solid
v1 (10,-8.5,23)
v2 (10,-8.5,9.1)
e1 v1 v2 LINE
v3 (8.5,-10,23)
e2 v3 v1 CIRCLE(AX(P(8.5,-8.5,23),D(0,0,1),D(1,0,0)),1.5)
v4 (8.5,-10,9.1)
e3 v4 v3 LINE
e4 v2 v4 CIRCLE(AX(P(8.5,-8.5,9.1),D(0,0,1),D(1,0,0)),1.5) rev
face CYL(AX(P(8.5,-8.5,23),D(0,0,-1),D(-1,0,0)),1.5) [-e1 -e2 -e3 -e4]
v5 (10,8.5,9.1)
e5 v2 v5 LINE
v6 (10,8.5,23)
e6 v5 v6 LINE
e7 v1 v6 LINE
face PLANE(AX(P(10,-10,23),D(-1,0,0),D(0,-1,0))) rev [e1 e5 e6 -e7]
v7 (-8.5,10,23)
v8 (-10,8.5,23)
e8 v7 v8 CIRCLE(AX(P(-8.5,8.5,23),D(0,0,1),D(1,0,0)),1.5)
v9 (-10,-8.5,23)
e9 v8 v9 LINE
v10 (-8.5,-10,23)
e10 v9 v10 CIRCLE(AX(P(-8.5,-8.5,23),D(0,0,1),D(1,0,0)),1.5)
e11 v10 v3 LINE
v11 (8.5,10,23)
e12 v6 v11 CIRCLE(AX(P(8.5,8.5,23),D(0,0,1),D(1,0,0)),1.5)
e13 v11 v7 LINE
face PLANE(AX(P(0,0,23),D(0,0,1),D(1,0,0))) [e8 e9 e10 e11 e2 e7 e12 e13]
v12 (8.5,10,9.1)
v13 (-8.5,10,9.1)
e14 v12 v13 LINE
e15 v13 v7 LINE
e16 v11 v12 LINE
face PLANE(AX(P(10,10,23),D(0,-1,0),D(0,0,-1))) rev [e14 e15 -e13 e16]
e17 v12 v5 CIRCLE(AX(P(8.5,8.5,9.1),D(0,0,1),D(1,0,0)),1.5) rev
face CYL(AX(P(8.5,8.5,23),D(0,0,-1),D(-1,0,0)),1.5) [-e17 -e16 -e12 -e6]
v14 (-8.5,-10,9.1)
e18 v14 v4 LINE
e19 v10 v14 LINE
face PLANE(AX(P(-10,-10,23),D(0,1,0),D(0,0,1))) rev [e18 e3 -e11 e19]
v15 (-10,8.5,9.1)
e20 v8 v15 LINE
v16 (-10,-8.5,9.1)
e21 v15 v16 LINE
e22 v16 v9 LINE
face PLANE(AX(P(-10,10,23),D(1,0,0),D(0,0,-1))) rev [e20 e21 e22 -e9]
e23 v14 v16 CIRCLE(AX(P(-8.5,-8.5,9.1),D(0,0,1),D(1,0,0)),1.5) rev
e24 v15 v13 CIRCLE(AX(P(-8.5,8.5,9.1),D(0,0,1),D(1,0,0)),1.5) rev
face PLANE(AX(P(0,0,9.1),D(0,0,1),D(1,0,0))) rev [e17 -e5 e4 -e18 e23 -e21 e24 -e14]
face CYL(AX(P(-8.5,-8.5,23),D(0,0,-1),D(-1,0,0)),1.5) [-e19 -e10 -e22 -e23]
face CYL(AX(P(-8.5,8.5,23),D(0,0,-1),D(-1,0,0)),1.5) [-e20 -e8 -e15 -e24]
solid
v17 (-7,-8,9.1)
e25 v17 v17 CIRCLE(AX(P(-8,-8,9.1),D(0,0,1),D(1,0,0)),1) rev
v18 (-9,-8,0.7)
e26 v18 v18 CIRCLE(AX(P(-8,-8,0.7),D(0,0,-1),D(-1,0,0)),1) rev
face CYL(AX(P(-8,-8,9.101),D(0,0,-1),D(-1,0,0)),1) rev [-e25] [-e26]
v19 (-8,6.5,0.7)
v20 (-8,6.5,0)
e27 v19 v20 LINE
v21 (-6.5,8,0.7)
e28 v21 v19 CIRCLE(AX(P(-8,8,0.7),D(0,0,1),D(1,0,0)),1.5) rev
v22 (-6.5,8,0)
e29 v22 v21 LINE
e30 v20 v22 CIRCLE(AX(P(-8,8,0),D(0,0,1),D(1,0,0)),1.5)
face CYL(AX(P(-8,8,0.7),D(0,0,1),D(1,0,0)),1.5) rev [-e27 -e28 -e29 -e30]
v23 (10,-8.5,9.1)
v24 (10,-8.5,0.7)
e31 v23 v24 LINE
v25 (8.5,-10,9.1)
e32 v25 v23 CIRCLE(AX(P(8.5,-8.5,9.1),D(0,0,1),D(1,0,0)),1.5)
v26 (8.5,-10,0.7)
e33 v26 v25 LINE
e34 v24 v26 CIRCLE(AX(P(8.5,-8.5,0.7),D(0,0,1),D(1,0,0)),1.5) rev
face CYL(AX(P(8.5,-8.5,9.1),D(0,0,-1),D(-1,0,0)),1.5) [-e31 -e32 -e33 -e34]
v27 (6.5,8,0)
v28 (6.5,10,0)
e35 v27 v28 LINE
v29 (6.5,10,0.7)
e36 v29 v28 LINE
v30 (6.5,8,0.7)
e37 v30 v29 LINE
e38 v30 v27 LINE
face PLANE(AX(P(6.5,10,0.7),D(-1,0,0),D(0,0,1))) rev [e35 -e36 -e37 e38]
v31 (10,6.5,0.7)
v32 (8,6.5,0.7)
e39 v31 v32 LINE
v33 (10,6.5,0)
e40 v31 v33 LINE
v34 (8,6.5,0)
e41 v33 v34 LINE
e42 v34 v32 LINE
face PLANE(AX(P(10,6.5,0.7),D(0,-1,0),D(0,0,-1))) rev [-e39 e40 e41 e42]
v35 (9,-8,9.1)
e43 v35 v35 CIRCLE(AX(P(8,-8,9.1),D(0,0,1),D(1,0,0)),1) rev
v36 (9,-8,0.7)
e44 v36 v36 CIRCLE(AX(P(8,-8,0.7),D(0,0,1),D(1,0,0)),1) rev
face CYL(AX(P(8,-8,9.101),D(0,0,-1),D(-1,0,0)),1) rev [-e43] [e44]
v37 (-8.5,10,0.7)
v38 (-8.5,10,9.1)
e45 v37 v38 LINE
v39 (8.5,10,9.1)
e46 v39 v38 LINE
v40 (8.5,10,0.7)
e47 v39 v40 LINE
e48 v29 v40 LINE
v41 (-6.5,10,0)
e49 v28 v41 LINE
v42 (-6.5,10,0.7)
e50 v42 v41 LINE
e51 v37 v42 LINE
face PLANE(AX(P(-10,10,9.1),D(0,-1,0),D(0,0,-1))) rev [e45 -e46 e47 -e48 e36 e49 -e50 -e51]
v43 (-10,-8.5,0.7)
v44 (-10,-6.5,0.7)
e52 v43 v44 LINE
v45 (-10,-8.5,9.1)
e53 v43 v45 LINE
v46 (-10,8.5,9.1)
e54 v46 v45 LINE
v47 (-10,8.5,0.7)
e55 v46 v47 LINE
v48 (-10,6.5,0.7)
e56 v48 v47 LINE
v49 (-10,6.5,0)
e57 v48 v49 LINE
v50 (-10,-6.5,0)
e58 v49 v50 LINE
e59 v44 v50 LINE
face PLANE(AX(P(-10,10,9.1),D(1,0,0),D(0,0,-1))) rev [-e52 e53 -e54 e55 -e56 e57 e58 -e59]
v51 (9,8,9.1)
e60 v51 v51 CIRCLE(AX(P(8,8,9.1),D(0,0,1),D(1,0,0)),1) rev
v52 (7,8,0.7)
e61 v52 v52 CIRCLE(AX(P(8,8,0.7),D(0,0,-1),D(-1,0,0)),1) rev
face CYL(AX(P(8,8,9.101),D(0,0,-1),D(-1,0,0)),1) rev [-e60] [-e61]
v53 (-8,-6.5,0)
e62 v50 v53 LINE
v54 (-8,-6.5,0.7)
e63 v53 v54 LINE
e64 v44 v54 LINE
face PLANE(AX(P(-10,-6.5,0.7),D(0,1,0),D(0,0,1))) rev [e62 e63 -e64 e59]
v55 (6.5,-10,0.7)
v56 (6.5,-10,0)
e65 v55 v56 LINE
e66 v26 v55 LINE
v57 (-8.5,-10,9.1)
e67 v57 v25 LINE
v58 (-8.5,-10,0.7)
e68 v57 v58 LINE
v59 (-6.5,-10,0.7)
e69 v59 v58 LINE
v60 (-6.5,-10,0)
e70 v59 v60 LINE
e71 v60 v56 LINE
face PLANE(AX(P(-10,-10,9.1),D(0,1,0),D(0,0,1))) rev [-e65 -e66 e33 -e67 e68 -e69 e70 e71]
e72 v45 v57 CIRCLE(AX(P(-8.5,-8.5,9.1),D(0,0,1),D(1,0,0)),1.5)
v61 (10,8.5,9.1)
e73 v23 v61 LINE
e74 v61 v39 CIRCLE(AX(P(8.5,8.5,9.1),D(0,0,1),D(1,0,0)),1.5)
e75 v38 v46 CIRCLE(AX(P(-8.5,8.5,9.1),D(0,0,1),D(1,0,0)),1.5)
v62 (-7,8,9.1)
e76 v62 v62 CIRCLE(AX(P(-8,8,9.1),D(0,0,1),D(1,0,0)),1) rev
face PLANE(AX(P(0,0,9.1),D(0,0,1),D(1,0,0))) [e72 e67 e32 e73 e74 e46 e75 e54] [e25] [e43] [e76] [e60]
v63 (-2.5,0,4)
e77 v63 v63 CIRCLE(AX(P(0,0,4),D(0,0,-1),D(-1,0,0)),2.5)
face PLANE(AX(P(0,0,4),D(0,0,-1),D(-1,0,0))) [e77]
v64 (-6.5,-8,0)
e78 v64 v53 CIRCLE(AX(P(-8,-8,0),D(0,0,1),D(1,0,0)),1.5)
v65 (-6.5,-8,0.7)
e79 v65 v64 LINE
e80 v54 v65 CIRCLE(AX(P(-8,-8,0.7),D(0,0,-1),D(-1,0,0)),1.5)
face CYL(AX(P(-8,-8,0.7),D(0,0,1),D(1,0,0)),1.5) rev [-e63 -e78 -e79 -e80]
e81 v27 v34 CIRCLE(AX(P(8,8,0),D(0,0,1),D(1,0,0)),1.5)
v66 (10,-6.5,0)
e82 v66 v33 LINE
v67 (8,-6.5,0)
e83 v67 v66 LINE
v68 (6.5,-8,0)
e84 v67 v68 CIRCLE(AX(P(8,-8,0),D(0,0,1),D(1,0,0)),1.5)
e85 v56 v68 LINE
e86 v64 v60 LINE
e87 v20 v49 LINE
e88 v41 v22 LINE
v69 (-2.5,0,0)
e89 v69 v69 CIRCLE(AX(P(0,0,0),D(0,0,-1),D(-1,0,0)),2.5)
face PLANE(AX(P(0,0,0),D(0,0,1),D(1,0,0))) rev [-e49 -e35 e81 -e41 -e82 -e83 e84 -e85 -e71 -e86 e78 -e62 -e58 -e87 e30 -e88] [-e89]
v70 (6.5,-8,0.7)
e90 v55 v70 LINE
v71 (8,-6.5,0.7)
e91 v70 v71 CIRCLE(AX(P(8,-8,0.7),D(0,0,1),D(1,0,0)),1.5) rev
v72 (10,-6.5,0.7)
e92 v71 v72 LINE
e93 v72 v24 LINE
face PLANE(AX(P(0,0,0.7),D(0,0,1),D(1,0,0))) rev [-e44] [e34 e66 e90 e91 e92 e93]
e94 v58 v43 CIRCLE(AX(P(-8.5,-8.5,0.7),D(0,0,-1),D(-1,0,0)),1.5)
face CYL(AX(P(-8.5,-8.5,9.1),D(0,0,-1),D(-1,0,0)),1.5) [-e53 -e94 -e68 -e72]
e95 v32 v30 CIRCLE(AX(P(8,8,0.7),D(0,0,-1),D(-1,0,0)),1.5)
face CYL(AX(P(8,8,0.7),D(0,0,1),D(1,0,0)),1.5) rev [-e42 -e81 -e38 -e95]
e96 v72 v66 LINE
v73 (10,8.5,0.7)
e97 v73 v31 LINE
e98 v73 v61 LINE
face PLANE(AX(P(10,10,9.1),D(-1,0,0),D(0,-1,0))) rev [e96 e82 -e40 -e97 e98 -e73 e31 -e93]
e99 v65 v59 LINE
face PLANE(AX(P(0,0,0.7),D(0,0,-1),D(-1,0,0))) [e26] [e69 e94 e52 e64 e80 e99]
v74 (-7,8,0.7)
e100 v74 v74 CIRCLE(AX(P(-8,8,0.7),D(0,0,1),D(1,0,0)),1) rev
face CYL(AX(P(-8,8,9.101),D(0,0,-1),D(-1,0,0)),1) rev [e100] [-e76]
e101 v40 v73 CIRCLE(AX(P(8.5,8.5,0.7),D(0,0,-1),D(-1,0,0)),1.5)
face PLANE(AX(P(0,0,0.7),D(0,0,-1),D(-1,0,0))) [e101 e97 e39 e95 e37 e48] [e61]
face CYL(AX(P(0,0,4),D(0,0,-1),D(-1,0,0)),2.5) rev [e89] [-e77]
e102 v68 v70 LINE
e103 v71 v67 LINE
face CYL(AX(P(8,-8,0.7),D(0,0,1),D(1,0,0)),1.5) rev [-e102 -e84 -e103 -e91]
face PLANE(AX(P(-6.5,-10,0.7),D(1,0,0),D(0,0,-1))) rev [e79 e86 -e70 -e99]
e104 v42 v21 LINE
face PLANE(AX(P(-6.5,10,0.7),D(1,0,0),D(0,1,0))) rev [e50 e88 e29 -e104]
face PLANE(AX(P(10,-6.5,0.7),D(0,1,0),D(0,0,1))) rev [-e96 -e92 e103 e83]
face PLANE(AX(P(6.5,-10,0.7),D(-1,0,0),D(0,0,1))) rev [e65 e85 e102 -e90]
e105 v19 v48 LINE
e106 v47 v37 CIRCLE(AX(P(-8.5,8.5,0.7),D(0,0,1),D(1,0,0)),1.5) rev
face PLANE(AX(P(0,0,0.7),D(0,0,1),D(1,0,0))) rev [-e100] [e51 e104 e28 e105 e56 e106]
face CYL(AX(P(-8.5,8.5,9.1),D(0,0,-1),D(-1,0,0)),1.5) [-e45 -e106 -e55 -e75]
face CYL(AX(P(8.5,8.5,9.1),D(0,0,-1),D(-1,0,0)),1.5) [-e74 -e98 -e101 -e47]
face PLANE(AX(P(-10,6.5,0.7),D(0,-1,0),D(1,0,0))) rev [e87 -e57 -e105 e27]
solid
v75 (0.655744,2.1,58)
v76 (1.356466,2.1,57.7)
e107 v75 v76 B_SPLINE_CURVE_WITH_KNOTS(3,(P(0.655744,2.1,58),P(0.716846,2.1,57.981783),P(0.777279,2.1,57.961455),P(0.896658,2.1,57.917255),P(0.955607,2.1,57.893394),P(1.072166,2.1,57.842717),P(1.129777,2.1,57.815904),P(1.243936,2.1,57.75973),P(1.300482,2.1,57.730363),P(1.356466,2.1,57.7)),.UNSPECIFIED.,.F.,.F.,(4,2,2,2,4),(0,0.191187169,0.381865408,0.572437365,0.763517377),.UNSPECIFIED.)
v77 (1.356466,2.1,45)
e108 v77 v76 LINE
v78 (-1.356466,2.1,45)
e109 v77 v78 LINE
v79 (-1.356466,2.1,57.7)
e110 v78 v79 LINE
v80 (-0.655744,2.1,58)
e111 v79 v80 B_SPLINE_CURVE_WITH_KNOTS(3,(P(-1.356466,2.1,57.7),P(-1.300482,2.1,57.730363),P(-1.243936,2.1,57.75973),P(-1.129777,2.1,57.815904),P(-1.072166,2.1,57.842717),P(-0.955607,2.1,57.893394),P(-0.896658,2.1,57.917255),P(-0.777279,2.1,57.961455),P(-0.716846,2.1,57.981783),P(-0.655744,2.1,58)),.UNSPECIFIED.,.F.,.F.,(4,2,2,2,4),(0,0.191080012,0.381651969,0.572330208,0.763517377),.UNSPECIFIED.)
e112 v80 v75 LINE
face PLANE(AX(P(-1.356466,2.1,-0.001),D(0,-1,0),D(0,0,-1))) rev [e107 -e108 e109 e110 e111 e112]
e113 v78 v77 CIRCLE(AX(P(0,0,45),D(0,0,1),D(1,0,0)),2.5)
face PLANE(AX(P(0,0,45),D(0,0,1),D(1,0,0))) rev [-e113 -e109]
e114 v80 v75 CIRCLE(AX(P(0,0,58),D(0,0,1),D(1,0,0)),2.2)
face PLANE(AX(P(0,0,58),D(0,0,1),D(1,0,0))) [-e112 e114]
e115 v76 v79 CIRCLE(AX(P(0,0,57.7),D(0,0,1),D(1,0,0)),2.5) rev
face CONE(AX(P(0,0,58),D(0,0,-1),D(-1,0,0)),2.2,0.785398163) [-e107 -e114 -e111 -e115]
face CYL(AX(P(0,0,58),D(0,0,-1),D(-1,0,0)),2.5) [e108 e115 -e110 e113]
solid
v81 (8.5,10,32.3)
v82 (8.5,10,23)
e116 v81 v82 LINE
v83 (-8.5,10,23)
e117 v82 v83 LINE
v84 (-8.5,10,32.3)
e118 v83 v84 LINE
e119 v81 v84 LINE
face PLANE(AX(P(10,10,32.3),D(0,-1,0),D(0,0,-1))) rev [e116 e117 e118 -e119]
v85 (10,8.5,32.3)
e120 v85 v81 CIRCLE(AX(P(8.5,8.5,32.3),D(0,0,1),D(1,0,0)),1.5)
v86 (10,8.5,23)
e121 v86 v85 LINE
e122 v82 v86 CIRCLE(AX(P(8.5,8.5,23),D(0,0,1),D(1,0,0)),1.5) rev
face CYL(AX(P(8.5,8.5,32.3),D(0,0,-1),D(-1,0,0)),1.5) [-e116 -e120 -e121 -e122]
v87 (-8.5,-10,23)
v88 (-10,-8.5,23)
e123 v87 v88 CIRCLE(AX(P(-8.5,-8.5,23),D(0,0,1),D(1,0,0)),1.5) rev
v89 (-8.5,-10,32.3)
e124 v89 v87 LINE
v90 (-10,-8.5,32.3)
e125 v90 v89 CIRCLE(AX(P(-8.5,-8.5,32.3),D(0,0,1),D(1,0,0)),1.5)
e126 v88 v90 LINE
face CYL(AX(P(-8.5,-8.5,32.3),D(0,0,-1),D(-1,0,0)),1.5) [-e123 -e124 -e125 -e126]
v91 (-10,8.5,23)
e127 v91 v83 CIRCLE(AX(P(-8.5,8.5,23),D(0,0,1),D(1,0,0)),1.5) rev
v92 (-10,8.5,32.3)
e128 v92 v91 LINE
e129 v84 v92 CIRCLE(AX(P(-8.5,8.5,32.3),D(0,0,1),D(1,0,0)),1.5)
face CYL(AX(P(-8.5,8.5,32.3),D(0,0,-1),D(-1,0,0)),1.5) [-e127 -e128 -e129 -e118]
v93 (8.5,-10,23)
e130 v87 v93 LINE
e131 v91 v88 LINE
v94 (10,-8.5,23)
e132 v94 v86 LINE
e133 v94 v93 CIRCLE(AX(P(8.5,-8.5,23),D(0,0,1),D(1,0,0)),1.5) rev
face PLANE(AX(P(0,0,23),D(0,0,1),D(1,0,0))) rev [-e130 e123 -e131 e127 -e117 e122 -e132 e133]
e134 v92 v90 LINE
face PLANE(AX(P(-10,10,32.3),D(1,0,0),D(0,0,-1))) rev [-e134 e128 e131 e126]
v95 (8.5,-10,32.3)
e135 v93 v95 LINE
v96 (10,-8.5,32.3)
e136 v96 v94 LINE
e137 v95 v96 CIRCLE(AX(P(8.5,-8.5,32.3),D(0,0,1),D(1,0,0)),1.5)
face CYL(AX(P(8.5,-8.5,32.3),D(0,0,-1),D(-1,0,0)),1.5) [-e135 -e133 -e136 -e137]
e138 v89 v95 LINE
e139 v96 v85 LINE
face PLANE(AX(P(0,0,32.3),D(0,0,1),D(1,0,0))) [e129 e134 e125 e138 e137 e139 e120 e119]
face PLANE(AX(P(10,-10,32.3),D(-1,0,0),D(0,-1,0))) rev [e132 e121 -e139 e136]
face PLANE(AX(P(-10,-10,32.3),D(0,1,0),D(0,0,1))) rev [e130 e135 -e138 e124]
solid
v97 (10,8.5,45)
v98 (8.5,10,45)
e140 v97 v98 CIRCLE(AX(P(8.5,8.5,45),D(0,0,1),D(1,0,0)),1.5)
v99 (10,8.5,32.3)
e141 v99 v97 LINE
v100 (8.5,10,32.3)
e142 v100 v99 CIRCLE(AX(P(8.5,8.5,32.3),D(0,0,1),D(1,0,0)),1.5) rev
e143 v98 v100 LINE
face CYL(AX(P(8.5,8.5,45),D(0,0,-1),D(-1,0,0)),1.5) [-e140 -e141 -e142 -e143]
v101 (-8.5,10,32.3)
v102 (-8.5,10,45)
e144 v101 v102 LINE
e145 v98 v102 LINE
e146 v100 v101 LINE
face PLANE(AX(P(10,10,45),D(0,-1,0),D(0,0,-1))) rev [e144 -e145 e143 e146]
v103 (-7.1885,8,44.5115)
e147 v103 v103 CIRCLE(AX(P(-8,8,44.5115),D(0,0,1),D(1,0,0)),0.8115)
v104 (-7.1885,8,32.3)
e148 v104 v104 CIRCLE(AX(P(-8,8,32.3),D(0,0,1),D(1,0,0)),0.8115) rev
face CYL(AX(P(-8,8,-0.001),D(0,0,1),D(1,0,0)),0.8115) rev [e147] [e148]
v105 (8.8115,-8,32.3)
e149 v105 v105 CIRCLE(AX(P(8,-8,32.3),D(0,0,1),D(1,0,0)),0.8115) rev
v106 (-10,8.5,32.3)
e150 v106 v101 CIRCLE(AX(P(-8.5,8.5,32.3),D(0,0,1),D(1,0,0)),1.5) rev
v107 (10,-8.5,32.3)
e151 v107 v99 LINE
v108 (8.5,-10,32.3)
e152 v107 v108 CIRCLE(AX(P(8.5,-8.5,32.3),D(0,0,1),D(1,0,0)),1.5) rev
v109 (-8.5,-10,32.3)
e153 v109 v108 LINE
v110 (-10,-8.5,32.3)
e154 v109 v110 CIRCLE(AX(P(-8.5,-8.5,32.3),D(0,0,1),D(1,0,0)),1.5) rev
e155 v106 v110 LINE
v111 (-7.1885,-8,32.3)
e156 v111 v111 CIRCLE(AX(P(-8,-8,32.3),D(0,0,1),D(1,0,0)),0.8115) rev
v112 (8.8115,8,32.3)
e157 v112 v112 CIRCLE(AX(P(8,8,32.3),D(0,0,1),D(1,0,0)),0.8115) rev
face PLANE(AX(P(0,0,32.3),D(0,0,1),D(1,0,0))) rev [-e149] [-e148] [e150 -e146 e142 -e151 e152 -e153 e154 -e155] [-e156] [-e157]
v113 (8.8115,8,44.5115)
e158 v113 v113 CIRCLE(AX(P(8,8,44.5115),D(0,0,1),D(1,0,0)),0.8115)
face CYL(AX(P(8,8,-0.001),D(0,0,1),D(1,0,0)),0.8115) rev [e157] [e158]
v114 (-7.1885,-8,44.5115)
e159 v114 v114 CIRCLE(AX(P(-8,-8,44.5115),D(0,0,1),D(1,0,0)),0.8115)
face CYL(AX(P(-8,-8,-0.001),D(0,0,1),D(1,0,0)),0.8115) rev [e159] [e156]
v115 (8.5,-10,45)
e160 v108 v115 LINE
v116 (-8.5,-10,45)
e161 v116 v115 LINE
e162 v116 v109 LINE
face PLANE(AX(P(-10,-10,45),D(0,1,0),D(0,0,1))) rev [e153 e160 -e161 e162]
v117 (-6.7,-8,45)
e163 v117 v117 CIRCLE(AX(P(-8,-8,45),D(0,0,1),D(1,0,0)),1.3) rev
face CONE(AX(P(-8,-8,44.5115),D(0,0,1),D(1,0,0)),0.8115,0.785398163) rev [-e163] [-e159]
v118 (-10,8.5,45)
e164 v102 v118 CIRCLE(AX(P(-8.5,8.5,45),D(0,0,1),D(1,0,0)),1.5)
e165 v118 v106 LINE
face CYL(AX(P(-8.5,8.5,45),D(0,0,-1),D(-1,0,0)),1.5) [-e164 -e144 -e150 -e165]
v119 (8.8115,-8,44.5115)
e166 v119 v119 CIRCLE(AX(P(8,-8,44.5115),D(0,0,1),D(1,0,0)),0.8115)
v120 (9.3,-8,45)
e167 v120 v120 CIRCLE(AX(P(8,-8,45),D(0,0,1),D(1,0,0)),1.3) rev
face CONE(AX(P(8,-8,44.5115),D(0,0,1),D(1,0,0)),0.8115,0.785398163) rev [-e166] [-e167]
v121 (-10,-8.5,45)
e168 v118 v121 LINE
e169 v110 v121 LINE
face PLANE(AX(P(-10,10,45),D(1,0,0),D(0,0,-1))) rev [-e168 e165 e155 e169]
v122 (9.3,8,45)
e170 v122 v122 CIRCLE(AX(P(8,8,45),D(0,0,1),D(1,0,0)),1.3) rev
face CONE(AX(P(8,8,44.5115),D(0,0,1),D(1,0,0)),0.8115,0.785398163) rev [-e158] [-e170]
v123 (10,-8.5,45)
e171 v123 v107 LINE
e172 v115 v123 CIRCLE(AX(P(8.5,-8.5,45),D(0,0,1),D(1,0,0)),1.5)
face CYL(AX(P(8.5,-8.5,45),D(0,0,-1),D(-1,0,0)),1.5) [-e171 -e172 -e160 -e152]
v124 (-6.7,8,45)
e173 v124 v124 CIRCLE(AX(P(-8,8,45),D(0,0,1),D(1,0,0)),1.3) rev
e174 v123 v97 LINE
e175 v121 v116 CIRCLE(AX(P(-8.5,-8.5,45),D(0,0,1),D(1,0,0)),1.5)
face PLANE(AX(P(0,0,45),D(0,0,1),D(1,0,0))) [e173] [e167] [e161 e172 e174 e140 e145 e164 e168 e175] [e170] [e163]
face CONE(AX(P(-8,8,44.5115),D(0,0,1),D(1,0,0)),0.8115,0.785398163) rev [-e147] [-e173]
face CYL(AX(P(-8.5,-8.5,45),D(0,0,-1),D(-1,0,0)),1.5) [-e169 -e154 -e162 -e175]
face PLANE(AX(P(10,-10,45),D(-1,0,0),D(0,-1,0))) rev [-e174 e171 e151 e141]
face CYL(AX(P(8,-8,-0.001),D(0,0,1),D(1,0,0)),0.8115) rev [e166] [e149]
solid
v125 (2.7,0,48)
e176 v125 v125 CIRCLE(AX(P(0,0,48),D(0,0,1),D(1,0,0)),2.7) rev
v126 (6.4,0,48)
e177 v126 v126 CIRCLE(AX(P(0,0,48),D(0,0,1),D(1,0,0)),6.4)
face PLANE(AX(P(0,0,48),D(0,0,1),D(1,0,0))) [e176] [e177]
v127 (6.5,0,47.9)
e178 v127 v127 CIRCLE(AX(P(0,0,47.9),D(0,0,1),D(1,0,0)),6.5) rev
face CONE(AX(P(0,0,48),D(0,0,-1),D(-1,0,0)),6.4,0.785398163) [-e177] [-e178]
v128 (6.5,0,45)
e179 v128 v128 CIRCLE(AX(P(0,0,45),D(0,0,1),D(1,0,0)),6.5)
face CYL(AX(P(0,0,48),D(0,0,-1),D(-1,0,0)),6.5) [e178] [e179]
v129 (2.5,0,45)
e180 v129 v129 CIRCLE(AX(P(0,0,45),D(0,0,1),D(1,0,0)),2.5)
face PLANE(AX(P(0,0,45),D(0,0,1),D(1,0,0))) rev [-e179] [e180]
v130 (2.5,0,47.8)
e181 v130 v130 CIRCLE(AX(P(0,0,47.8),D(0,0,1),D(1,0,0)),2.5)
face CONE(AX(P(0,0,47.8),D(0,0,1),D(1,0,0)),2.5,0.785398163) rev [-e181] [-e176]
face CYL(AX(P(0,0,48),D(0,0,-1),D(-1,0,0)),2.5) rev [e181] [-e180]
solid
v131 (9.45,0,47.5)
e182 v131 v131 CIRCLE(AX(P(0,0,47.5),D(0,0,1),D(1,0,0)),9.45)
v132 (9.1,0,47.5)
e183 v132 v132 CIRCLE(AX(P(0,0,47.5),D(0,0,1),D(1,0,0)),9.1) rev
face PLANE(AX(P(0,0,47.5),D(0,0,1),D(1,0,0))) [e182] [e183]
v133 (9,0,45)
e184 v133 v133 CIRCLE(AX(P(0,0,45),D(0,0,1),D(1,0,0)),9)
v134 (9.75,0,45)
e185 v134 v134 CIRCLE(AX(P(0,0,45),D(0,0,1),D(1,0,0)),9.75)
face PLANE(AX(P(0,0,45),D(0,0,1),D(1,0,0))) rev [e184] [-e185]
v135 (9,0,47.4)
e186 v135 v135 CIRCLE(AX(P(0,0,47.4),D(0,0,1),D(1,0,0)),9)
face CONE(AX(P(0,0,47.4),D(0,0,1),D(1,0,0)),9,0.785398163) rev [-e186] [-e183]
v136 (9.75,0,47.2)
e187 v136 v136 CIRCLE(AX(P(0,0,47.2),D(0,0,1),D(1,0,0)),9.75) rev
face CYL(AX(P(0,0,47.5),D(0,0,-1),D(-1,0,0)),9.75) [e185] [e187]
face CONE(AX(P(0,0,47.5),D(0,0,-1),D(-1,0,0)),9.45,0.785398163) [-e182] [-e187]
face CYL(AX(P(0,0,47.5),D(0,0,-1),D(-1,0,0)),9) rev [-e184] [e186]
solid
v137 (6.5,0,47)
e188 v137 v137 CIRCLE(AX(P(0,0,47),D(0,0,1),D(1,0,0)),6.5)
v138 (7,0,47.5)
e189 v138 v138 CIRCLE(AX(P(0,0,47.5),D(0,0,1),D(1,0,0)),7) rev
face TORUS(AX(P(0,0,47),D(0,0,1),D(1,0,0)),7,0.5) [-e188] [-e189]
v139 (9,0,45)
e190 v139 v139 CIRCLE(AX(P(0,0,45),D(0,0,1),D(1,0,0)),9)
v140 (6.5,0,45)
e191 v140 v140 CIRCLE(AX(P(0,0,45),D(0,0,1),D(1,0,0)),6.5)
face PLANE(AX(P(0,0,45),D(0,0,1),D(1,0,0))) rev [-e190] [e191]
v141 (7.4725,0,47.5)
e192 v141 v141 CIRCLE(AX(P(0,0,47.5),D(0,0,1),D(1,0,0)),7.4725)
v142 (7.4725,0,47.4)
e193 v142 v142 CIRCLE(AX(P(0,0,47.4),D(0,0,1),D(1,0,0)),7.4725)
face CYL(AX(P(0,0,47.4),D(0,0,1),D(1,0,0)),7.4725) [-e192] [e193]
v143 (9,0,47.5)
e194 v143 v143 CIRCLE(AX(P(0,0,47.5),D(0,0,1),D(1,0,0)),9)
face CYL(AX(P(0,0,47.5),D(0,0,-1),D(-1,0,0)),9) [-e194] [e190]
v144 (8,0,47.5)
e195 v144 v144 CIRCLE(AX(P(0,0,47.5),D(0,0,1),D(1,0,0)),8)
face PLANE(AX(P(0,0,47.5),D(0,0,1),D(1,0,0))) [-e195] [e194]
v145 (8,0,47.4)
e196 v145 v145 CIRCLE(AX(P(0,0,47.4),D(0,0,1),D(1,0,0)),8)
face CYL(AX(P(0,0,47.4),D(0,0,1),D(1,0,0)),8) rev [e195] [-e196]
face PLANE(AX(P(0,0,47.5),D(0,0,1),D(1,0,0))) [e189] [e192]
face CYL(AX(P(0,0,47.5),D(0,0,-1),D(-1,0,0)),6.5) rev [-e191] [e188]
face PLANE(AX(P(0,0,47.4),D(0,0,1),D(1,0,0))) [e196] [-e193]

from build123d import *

# Parameters (mm, degrees)
SKETCH_1_W          = 20
SKETCH_1_H          = 20
EXTRUDE_1_DEPTH     = 9.1
CUT_EXTRUDE_1_REACH = 18.817
SKETCH_2_R          = 1
SKETCH_3_W          = 3.5
SKETCH_3_H          = 3.5
CUT_EXTRUDE_2_DEPTH = 0.7
FILLET_1_R          = 1.5
SKETCH_12_R         = 2.5
CUT_EXTRUDE_6_DEPTH = 4
SKETCH_4_W          = 20
SKETCH_4_H          = 20
EXTRUDE_2_DEPTH     = 13.9
SKETCH_5_W          = 20
SKETCH_5_H          = 20
EXTRUDE_3_DEPTH     = 9.3
SKETCH_7_W          = 20
SKETCH_7_H          = 20
EXTRUDE_4_DEPTH     = 12.7
SKETCH_8_R          = 0.8115
CUT_EXTRUDE_4_DEPTH = 12.7
FILLET_2_R          = 1.5
FILLET_3_R          = 1.5
FILLET_4_R          = 1.5
FILLET_5_R          = 1.5
CHAMFER_2_SIZE      = 0.4885
SKETCH_13_R         = 9.75
SKETCH_13_R_2       = 9
EXTRUDE_5_DEPTH     = 2.5
CHAMFER_3_SIZE      = 0.3
CHAMFER_4_SIZE      = 0.1
SKETCH_14_R         = 6.5
SKETCH_14_R_2       = 2.5
EXTRUDE_6_DEPTH     = 3
CHAMFER_5_SIZE      = 0.1
CHAMFER_6_SIZE      = 0.2
SKETCH_15_R         = 9
SKETCH_15_R_2       = 6.5
EXTRUDE_7_DEPTH     = 2.5
FILLET_6_R          = 0.5
SKETCH_16_R         = 8
SKETCH_16_R_2       = 7.4725
CUT_EXTRUDE_7_DEPTH = 0.1
SKETCH_17_R         = 2.5
EXTRUDE_8_DEPTH     = 13
CUT_EXTRUDE_START   = -13
CUT_EXTRUDE_8_DEPTH = 13
CHAMFER_7_SIZE      = 0.3


with BuildPart() as part:
    # 草图1 → 凸台-拉伸1 (new body)
    with BuildSketch(Plane.XY):
        Rectangle(SKETCH_1_W, SKETCH_1_H)
    extrude(amount=EXTRUDE_1_DEPTH)

    # 草图2 → 切除-拉伸1 (cut, up to next)
    with BuildSketch(Plane(origin=(0, 0, 0), x_dir=(-1, 0, 0), z_dir=(0, 0, -1)), mode=Mode.PRIVATE) as cut_extrude_1_sk1:
        with Locations((-8, 8)):
            Circle(SKETCH_2_R)
    cut_extrude_1_tool1 = extrude(cut_extrude_1_sk1.sketch, amount=-CUT_EXTRUDE_1_REACH, mode=Mode.PRIVATE) & part.part
    # 草图2 → 切除-拉伸1 (cut, up to next)
    with BuildSketch(Plane(origin=(0, 0, 0), x_dir=(-1, 0, 0), z_dir=(0, 0, -1)), mode=Mode.PRIVATE) as cut_extrude_1_sk2:
        with Locations((8, 8)):
            Circle(SKETCH_2_R)
    cut_extrude_1_tool2 = extrude(cut_extrude_1_sk2.sketch, amount=-CUT_EXTRUDE_1_REACH, mode=Mode.PRIVATE) & part.part
    # 草图2 → 切除-拉伸1 (cut, up to next)
    with BuildSketch(Plane(origin=(0, 0, 0), x_dir=(-1, 0, 0), z_dir=(0, 0, -1)), mode=Mode.PRIVATE) as cut_extrude_1_sk3:
        with Locations((8, -8)):
            Circle(SKETCH_2_R)
    cut_extrude_1_tool3 = extrude(cut_extrude_1_sk3.sketch, amount=-CUT_EXTRUDE_1_REACH, mode=Mode.PRIVATE) & part.part
    # 草图2 → 切除-拉伸1 (cut, up to next)
    with BuildSketch(Plane(origin=(0, 0, 0), x_dir=(-1, 0, 0), z_dir=(0, 0, -1)), mode=Mode.PRIVATE) as cut_extrude_1_sk4:
        with Locations((-8, -8)):
            Circle(SKETCH_2_R)
    cut_extrude_1_tool4 = extrude(cut_extrude_1_sk4.sketch, amount=-CUT_EXTRUDE_1_REACH, mode=Mode.PRIVATE) & part.part
    add(cut_extrude_1_tool1.solids().sort_by_distance((8, 8, 0))[0], mode=Mode.SUBTRACT)
    add(cut_extrude_1_tool2.solids().sort_by_distance((-8, 8, 0))[0], mode=Mode.SUBTRACT)
    add(cut_extrude_1_tool3.solids().sort_by_distance((-8, -8, 0))[0], mode=Mode.SUBTRACT)
    add(cut_extrude_1_tool4.solids().sort_by_distance((8, -8, 0))[0], mode=Mode.SUBTRACT)

    # 草图3 → 切除-拉伸2 (cut)
    with BuildSketch(Plane(origin=(0, 0, 0), x_dir=(-1, 0, 0), z_dir=(0, 0, -1))):
        with Locations((-8.25, 8.25)):
            Rectangle(SKETCH_3_W, SKETCH_3_H)
        with Locations((8.25, 8.25)):
            Rectangle(SKETCH_3_W, SKETCH_3_H)
        with Locations((8.25, -8.25)):
            Rectangle(SKETCH_3_W, SKETCH_3_H)
        with Locations((-8.25, -8.25)):
            Rectangle(SKETCH_3_W, SKETCH_3_H)
    extrude(amount=-CUT_EXTRUDE_2_DEPTH, mode=Mode.SUBTRACT)

    # 圆角1
    fillet_1_edges = [part.edges().sort_by_distance(p)[0] for p in [
        (6.5, -6.5, 0.35),
        (-6.5, -6.5, 0.35),
        (-6.5, 6.5, 0.35),
        (6.5, 6.5, 0.35),
    ]]
    fillet(fillet_1_edges, radius=FILLET_1_R)

    # 草图12 → 切除-拉伸6 (cut)
    with BuildSketch(Plane(origin=(0, 0, 0), x_dir=(-1, 0, 0), z_dir=(0, 0, -1))):
        Circle(SKETCH_12_R)
    extrude(amount=-CUT_EXTRUDE_6_DEPTH, mode=Mode.SUBTRACT)

    # 圆角5
    fillet_5_edges = [part.edges().sort_by_distance(p)[0] for p in [
        (10, -10, 4.9),
        (-10, -10, 4.9),
        (-10, 10, 4.9),
        (10, 10, 4.9),
    ]]
    fillet(fillet_5_edges, radius=FILLET_5_R)


with BuildPart() as body_2:
    # 草图4 → 凸台-拉伸2 (new body)
    with BuildSketch(Plane.XY.offset(9.1)):
        Rectangle(SKETCH_4_W, SKETCH_4_H)
    extrude(amount=EXTRUDE_2_DEPTH)

    # 圆角4
    fillet_4_edges = [body_2.edges().sort_by_distance(p)[0] for p in [
        (-10, -10, 16.05),
        (-10, 10, 16.05),
        (10, 10, 16.05),
        (10, -10, 16.05),
    ]]
    fillet(fillet_4_edges, radius=FILLET_4_R)


with BuildPart() as body_3:
    # 草图5 → 凸台-拉伸3 (new body)
    with BuildSketch(Plane.XY.offset(23)):
        Rectangle(SKETCH_5_W, SKETCH_5_H)
    extrude(amount=EXTRUDE_3_DEPTH)

    # 圆角3
    fillet_3_edges = [body_3.edges().sort_by_distance(p)[0] for p in [
        (-10, 10, 27.65),
        (10, 10, 27.65),
        (10, -10, 27.65),
        (-10, -10, 27.65),
    ]]
    fillet(fillet_3_edges, radius=FILLET_3_R)


with BuildPart() as body_4:
    # 草图7 → 凸台-拉伸4 (new body)
    with BuildSketch(Plane.XY.offset(32.3)):
        Rectangle(SKETCH_7_W, SKETCH_7_H)
    extrude(amount=EXTRUDE_4_DEPTH)

    # 草图8 → 切除-拉伸4 (cut)
    with BuildSketch(Plane.XY.offset(45)):
        with Locations((-8, 8)):
            Circle(SKETCH_8_R)
        with Locations((8, 8)):
            Circle(SKETCH_8_R)
        with Locations((8, -8)):
            Circle(SKETCH_8_R)
        with Locations((-8, -8)):
            Circle(SKETCH_8_R)
    extrude(amount=-CUT_EXTRUDE_4_DEPTH, mode=Mode.SUBTRACT)

    # 圆角2
    fillet_2_edges = [body_4.edges().sort_by_distance(p)[0] for p in [
        (10, 10, 38.65),
        (10, -10, 38.65),
        (-10, -10, 38.65),
        (-10, 10, 38.65),
    ]]
    fillet(fillet_2_edges, radius=FILLET_2_R)

    # 倒角2
    chamfer_2_edges = [body_4.edges().sort_by_distance(p)[0] for p in [
        (-8.8115, -8, 45),
        (7.1885, -8, 45),
        (7.1885, 8, 45),
        (-8.8115, 8, 45),
    ]]
    chamfer(chamfer_2_edges, length=CHAMFER_2_SIZE)


with BuildPart() as body_5:
    # 草图13 → 凸台-拉伸5 (new body)
    with BuildSketch(Plane.XY.offset(45)):
        Circle(SKETCH_13_R)
        Circle(SKETCH_13_R_2, mode=Mode.SUBTRACT)
    extrude(amount=EXTRUDE_5_DEPTH)

    # 倒角3
    chamfer_3_edges = [body_5.edges().sort_by_distance(p)[0] for p in [
        (-9.75, 0, 47.5),
    ]]
    chamfer(chamfer_3_edges, length=CHAMFER_3_SIZE)

    # 倒角4
    chamfer_4_edges = [body_5.edges().sort_by_distance(p)[0] for p in [
        (-9, 0, 47.5),
    ]]
    chamfer(chamfer_4_edges, length=CHAMFER_4_SIZE)


with BuildPart() as body_6:
    # 草图14 → 凸台-拉伸6 (new body)
    with BuildSketch(Plane.XY.offset(45)):
        Circle(SKETCH_14_R)
        Circle(SKETCH_14_R_2, mode=Mode.SUBTRACT)
    extrude(amount=EXTRUDE_6_DEPTH)

    # 倒角5
    chamfer_5_edges = [body_6.edges().sort_by_distance(p)[0] for p in [
        (-6.5, 0, 48),
    ]]
    chamfer(chamfer_5_edges, length=CHAMFER_5_SIZE)

    # 倒角6
    chamfer_6_edges = [body_6.edges().sort_by_distance(p)[0] for p in [
        (-2.5, 0, 48),
    ]]
    chamfer(chamfer_6_edges, length=CHAMFER_6_SIZE)


with BuildPart() as body_7:
    # 草图15 → 凸台-拉伸7 (new body)
    with BuildSketch(Plane.XY.offset(45)):
        Circle(SKETCH_15_R)
        Circle(SKETCH_15_R_2, mode=Mode.SUBTRACT)
    extrude(amount=EXTRUDE_7_DEPTH)

    # 圆角6
    fillet_6_edges = [body_7.edges().sort_by_distance(p)[0] for p in [
        (-6.5, 0, 47.5),
    ]]
    fillet(fillet_6_edges, radius=FILLET_6_R)

    # 草图16 → 切除-拉伸7 (cut)
    with BuildSketch(Plane.XY.offset(47.5)):
        Circle(SKETCH_16_R)
        Circle(SKETCH_16_R_2, mode=Mode.SUBTRACT)
    extrude(amount=-CUT_EXTRUDE_7_DEPTH, mode=Mode.SUBTRACT)


with BuildPart() as body_8:
    # 草图17 → 凸台-拉伸8 (new body)
    with BuildSketch(Plane.XY.offset(45)):
        with Locations(Location((0, 0, 0), (0, 0, 180))):
            Circle(SKETCH_17_R)
    extrude(amount=EXTRUDE_8_DEPTH)

    # 草图18 → 切除-拉伸8 (cut)
    with BuildSketch(Plane.XY.offset(58).offset(CUT_EXTRUDE_START)):
        with BuildLine():
            Line((-1.356465997, 2.1), (1.356465997, 2.1))
            ThreePointArc((1.356465997, 2.1), (0, 2.5), (-1.356465997, 2.1))
        make_face()
    extrude(amount=CUT_EXTRUDE_8_DEPTH, mode=Mode.SUBTRACT)

    # 倒角7
    chamfer_7_edges = [body_8.edges().sort_by_distance(p)[0] for p in [
        (0, -2.5, 58),
    ]]
    chamfer(chamfer_7_edges, length=CHAMFER_7_SIZE)


solid = Compound([part.part, body_2.part, body_3.part, body_4.part, body_5.part, body_6.part, body_7.part, body_8.part])
